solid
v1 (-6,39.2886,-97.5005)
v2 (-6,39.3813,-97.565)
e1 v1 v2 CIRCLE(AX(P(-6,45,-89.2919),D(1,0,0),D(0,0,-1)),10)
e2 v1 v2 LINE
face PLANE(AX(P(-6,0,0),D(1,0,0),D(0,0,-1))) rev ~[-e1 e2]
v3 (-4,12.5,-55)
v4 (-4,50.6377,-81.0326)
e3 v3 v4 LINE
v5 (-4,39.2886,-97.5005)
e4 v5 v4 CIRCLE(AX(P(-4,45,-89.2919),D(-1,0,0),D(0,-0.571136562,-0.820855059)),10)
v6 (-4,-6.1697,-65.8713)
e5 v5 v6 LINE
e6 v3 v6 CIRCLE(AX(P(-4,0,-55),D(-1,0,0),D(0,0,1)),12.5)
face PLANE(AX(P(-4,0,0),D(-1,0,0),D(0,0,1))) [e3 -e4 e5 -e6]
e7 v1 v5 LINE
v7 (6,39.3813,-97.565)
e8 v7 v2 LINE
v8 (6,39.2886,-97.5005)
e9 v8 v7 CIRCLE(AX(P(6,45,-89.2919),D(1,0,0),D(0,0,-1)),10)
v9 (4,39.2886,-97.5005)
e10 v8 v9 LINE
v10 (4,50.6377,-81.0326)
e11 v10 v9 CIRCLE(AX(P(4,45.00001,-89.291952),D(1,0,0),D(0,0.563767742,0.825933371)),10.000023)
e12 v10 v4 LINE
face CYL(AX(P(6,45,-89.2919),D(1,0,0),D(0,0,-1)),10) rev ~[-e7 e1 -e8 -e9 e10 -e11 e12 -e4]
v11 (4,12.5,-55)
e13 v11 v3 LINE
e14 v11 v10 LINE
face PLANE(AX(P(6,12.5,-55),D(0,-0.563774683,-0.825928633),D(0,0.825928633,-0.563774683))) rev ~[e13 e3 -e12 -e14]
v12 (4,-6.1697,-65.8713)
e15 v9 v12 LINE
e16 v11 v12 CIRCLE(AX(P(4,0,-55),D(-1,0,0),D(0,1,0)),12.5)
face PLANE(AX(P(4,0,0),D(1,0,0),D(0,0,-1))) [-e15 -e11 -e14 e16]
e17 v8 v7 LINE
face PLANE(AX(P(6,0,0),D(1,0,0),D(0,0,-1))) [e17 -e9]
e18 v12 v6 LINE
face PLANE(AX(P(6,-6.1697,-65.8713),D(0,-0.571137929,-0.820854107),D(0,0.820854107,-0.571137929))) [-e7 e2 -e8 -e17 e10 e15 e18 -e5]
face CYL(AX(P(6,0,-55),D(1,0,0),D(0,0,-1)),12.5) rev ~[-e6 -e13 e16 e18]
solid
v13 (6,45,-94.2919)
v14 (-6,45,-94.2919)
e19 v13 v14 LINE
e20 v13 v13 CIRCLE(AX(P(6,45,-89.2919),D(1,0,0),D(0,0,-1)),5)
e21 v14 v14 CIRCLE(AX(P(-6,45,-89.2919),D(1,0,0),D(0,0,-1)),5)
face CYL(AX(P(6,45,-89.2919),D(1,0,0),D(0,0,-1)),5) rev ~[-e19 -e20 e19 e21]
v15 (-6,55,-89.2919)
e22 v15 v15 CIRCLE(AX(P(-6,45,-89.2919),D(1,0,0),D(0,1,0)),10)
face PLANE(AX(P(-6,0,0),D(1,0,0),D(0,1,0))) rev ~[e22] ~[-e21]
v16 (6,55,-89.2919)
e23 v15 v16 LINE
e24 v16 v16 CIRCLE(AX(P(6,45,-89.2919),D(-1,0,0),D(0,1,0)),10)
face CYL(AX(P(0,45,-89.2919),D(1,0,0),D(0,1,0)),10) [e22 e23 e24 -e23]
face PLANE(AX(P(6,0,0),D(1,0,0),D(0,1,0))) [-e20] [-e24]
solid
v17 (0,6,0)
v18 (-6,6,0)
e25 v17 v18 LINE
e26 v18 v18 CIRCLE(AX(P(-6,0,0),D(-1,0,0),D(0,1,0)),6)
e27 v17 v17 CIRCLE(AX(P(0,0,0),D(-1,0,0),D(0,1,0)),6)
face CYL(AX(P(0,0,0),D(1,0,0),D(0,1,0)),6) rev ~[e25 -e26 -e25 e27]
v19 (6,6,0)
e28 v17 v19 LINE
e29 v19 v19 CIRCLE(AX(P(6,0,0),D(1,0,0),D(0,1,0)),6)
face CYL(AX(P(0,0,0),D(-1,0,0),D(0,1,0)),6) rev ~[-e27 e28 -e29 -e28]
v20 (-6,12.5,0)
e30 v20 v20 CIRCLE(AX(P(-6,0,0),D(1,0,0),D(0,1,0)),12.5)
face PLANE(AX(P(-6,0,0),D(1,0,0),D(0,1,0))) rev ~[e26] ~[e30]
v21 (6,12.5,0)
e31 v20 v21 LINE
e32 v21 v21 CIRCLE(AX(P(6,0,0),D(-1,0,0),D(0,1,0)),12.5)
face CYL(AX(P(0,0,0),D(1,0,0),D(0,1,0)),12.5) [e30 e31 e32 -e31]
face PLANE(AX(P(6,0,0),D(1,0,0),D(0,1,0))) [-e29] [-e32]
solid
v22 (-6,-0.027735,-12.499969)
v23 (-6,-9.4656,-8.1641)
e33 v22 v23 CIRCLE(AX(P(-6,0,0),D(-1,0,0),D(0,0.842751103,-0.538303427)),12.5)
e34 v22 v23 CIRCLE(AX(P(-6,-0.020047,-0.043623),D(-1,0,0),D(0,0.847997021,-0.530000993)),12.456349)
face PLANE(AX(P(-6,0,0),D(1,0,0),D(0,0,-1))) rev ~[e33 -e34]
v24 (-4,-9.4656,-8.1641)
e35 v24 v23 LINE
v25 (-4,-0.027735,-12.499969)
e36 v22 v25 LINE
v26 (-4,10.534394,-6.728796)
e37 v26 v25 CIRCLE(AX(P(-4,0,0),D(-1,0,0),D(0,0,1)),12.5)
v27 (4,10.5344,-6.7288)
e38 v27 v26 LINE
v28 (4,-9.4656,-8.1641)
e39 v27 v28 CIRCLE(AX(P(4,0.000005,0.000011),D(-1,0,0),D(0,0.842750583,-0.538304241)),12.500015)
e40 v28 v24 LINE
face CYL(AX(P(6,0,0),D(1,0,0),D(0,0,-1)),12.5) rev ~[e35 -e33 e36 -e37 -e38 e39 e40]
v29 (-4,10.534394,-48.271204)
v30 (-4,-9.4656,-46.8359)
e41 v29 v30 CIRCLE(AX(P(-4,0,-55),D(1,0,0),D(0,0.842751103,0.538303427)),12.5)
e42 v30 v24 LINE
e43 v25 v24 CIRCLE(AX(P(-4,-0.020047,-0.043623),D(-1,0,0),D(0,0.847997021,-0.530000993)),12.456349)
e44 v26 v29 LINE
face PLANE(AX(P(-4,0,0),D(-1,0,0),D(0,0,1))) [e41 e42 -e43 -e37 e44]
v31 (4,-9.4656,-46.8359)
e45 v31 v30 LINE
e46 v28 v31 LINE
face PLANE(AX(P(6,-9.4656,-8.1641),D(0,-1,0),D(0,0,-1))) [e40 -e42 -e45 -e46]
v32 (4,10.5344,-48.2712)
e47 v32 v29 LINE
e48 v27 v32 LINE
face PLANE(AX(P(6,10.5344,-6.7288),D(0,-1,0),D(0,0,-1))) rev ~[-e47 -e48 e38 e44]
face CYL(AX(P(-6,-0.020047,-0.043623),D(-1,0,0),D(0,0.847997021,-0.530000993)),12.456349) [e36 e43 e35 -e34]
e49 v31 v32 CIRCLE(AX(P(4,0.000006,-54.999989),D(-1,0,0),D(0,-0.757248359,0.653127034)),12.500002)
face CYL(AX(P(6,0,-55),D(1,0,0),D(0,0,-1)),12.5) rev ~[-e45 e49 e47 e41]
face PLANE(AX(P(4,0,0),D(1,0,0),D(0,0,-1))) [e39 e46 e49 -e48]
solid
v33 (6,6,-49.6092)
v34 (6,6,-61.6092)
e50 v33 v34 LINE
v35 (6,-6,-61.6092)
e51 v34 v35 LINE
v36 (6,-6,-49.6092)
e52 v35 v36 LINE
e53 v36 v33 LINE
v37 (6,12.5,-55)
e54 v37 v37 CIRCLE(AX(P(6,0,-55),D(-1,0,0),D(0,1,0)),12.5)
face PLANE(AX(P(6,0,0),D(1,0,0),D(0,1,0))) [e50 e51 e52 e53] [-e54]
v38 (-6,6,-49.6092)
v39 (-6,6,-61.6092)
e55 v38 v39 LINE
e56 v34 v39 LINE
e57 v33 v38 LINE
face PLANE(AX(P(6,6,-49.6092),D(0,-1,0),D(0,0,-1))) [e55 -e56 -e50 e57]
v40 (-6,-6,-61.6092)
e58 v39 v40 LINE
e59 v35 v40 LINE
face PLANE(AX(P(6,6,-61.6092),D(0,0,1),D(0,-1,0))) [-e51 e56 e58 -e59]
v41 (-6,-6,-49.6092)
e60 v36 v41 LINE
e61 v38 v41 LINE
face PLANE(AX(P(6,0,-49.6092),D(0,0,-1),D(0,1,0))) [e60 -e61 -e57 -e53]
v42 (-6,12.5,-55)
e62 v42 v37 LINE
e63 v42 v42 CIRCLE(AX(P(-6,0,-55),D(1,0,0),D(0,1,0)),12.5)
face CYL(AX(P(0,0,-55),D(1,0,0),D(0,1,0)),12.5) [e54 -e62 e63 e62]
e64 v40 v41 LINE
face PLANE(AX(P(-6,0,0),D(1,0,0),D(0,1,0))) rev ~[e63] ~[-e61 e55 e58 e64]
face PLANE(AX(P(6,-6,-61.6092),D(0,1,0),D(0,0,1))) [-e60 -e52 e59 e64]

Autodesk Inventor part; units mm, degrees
ref_plane "YZ Plane" through (0, 0, 0) normal (1, 0, 0) x (0, 1, 0)
ref_plane "XZ Plane" through (0, 0, 0) normal (0, 1, 0) x (-1, 0, 0)
ref_plane "XY Plane" through (0, 0, 0) normal (0, 0, 1) x (1, 0, 0)
sketch "Sketch4" plane through (0, 0, 0) normal (1, 0, 0) x (0, 1, 0)
  line L0 (0, 0) -> (0, -55)
  line L1 (0, -55) -> (45, -89.2919)
  circle A0 centre (0, 0) radius 12.5
  circle A1 centre (0, 0) radius 6
  circle A2 centre (0, -55) radius 12.5
  circle A3 centre (45, -89.2919) radius 10
  circle A4 centre (45, -89.2919) radius 5
  line L2 (8.7921, -8.8853) -> (8.7921, -46.1147)
  line L3 (-11.2079, -5.5348) -> (-11.2079, -49.4652)
  line L4 (-6, -65.9659) -> (37.4603, -95.861)
  line L5 (12.4075, -56.5181) -> (50.3971, -80.8734)
  point P0 (0, -50.7919)
  dimension "d15" = 10
  dimension "d16" = 20
  dimension "d17" = 25
  dimension "d18" = 12
  dimension "d19" = 25
  dimension "d20" = 20
  dimension "d24" = 45
  dimension "d29" = 55
extrude "Extrusion2" add sketch "Sketch4" along normal mid plane 12 contours A0 | A2 L1 L0 | L0 L1 A2 | A3 | A4
sketch "Sketch5" plane through (6, 0, 0) normal (1, 0, 0) x (0, 0, -1)
  circle A0 centre (0, 0) radius 12.5 projected
  line L0 (6.7288, 10.5344) -> (48.2712, 10.5344)
  circle A1 centre (55, 0) radius 12.5 projected
  line L1 (55, 12.5) -> (81.0326, 50.6377)
  circle A2 centre (89.2919, 45) radius 10 projected
  line L2 (65.8713, -6.1697) -> (97.565, 39.3813)
  line L3 (8.1641, -9.4656) -> (46.8359, -9.4656)
  point P0 (97.5005, 39.2886)
  dimension "d34" = 20
extrude "Extrusion3" add sketch "Sketch5" against normal blind 12 separate body contours A0 L0 A1 L3 | L1 A2 L2 A1
sketch "Sketch7" plane through (6, 45, -89.2919) normal (1, 0, 0) x (0, 0, -1)
  line L0 (-39.6827, -39) -> (-27.6827, -39)
  line L1 (-27.6827, -39) -> (-27.6827, -51)
  line L2 (-27.6827, -51) -> (-39.6827, -51)
  line L3 (-39.6827, -51) -> (-39.6827, -39)
  line L4 (-89.2919, -45) -> (-34.2919, -45)
  point P0 (-33.6827, -39)
  point P1 (-27.6827, -45)
  dimension "d42" = 55
  dimension "d43" = 12
  dimension "d44" = 12
  dimension "d45" = 6
extrude "Extrusion5" cut sketch "Sketch7" against normal blind 12 bodies 1
sketch "Sketch9" plane through (6, 45, -89.2919) normal (1, 0, 0) x (0, 0, -1)
  circle A0 centre (0, 0) radius 5
  point P0 (-89.2919, -45)
  dimension "d48" = 10
extrude "Extrusion6" cut sketch "Sketch9" against normal blind 12 bodies 1
sketch "Sketch11" plane through (6, 0, 0) normal (1, 0, 0) x (0, 0, -1)
  line L0 (6.7288, 10.5344) -> (48.2712, 10.5344) projected
  arc A0 (48.2712, 10.5344) -> (46.8359, -9.4656) centre (55, 0) ccw projected
  line L1 (6.7288, 10.5344) -> (48.2712, 10.5344)
  arc A1 (8.1641, -9.4656) -> (6.7288, 10.5344) centre (0, 0) ccw projected
  line L2 (8.1641, -9.4656) -> (46.8359, -9.4656) projected
  line L3 (8.1641, -9.4656) -> (46.8359, -9.4656)
  line L4 (0, 0) -> (55, 0)
  arc A2 (8.1641, -9.4656) -> (6.7288, 10.5344) centre (0, 0) ccw
  arc A3 (48.2712, 10.5344) -> (46.8359, -9.4656) centre (55, 0) ccw
extrude "Extrusion7" cut sketch "Sketch11" against normal blind 2 bodies 2
sketch "Sketch12" plane through (6, 0, 0) normal (1, 0, 0) x (0, 0, -1)
  circle A0 centre (55, 0) radius 12.5 projected
  line L0 (97.5005, 39.2886) -> (65.8713, -6.1697) projected
  line L1 (65.8713, -6.1697) -> (97.5005, 39.2886)
  arc A1 (65.8713, -6.1697) -> (55, 12.5) centre (55, 0) ccw
  line L2 (55, 12.5) -> (81.0326, 50.6377) projected
  line L3 (55, 12.5) -> (81.0326, 50.6377)
  arc A2 (81.0326, 50.6377) -> (97.5005, 39.2886) centre (89.2919, 45) ccw
  point P0 (0, 0)
extrude "Extrusion8" cut sketch "Sketch12" against normal blind 2 contours A0 L2 A2 L0 bodies 2
sketch "Sketch13" plane through (-6, 0, 0) normal (-1, 0, 0) x (0, 0, 1)
  circle A0 centre (-55, 0) radius 12.5 projected
  line L0 (-48.2846, 10.5429) -> (-6.6455, 10.5429)
  circle A1 centre (0, 0) radius 12.5 projected
  line L1 (-46.8359, -9.4656) -> (-8.1641, -9.4656) projected
  line L2 (-8.1641, -9.4656) -> (-46.8359, -9.4656)
  arc A2 (-46.8359, -9.4656) -> (-48.2846, 10.5429) centre (-55, 0) ccw
  arc A3 (-6.6455, 10.5429) -> (-8.1641, -9.4656) centre (-0.0437, -0.02) ccw
  point P0 (-12.5, 0)
  point P1 (-6.7154, 10.5429)
extrude "Extrusion9" cut sketch "Sketch13" against normal blind 2 contours A0 L0 A1 A3 L1 bodies 2
sketch "Sketch14" plane through (-6, 0, 0) normal (-1, 0, 0) x (0, 0, 1)
  circle A0 centre (-89.2919, 45) radius 10 projected
  circle A1 centre (-55, 0) radius 12.5 projected
  line L0 (-97.5005, 39.2886) -> (-65.8713, -6.1697) projected
  line L1 (-97.5005, 39.2886) -> (-65.8713, -6.1697)
  arc A2 (-97.5005, 39.2886) -> (-81.0326, 50.6377) centre (-89.2919, 45) ccw
  arc A3 (-55, 12.5) -> (-65.8713, -6.1697) centre (-55, 0) ccw
  line L2 (-55, 12.5) -> (-81.0326, 50.6377) projected
  line L3 (-81.0326, 50.6377) -> (-55, 12.5)
  point P0 (0, 0)
extrude "Extrusion10" cut sketch "Sketch14" against normal blind 2 contours A0 L2 A1 L0 bodies 2
properties part number "Tipo1"
